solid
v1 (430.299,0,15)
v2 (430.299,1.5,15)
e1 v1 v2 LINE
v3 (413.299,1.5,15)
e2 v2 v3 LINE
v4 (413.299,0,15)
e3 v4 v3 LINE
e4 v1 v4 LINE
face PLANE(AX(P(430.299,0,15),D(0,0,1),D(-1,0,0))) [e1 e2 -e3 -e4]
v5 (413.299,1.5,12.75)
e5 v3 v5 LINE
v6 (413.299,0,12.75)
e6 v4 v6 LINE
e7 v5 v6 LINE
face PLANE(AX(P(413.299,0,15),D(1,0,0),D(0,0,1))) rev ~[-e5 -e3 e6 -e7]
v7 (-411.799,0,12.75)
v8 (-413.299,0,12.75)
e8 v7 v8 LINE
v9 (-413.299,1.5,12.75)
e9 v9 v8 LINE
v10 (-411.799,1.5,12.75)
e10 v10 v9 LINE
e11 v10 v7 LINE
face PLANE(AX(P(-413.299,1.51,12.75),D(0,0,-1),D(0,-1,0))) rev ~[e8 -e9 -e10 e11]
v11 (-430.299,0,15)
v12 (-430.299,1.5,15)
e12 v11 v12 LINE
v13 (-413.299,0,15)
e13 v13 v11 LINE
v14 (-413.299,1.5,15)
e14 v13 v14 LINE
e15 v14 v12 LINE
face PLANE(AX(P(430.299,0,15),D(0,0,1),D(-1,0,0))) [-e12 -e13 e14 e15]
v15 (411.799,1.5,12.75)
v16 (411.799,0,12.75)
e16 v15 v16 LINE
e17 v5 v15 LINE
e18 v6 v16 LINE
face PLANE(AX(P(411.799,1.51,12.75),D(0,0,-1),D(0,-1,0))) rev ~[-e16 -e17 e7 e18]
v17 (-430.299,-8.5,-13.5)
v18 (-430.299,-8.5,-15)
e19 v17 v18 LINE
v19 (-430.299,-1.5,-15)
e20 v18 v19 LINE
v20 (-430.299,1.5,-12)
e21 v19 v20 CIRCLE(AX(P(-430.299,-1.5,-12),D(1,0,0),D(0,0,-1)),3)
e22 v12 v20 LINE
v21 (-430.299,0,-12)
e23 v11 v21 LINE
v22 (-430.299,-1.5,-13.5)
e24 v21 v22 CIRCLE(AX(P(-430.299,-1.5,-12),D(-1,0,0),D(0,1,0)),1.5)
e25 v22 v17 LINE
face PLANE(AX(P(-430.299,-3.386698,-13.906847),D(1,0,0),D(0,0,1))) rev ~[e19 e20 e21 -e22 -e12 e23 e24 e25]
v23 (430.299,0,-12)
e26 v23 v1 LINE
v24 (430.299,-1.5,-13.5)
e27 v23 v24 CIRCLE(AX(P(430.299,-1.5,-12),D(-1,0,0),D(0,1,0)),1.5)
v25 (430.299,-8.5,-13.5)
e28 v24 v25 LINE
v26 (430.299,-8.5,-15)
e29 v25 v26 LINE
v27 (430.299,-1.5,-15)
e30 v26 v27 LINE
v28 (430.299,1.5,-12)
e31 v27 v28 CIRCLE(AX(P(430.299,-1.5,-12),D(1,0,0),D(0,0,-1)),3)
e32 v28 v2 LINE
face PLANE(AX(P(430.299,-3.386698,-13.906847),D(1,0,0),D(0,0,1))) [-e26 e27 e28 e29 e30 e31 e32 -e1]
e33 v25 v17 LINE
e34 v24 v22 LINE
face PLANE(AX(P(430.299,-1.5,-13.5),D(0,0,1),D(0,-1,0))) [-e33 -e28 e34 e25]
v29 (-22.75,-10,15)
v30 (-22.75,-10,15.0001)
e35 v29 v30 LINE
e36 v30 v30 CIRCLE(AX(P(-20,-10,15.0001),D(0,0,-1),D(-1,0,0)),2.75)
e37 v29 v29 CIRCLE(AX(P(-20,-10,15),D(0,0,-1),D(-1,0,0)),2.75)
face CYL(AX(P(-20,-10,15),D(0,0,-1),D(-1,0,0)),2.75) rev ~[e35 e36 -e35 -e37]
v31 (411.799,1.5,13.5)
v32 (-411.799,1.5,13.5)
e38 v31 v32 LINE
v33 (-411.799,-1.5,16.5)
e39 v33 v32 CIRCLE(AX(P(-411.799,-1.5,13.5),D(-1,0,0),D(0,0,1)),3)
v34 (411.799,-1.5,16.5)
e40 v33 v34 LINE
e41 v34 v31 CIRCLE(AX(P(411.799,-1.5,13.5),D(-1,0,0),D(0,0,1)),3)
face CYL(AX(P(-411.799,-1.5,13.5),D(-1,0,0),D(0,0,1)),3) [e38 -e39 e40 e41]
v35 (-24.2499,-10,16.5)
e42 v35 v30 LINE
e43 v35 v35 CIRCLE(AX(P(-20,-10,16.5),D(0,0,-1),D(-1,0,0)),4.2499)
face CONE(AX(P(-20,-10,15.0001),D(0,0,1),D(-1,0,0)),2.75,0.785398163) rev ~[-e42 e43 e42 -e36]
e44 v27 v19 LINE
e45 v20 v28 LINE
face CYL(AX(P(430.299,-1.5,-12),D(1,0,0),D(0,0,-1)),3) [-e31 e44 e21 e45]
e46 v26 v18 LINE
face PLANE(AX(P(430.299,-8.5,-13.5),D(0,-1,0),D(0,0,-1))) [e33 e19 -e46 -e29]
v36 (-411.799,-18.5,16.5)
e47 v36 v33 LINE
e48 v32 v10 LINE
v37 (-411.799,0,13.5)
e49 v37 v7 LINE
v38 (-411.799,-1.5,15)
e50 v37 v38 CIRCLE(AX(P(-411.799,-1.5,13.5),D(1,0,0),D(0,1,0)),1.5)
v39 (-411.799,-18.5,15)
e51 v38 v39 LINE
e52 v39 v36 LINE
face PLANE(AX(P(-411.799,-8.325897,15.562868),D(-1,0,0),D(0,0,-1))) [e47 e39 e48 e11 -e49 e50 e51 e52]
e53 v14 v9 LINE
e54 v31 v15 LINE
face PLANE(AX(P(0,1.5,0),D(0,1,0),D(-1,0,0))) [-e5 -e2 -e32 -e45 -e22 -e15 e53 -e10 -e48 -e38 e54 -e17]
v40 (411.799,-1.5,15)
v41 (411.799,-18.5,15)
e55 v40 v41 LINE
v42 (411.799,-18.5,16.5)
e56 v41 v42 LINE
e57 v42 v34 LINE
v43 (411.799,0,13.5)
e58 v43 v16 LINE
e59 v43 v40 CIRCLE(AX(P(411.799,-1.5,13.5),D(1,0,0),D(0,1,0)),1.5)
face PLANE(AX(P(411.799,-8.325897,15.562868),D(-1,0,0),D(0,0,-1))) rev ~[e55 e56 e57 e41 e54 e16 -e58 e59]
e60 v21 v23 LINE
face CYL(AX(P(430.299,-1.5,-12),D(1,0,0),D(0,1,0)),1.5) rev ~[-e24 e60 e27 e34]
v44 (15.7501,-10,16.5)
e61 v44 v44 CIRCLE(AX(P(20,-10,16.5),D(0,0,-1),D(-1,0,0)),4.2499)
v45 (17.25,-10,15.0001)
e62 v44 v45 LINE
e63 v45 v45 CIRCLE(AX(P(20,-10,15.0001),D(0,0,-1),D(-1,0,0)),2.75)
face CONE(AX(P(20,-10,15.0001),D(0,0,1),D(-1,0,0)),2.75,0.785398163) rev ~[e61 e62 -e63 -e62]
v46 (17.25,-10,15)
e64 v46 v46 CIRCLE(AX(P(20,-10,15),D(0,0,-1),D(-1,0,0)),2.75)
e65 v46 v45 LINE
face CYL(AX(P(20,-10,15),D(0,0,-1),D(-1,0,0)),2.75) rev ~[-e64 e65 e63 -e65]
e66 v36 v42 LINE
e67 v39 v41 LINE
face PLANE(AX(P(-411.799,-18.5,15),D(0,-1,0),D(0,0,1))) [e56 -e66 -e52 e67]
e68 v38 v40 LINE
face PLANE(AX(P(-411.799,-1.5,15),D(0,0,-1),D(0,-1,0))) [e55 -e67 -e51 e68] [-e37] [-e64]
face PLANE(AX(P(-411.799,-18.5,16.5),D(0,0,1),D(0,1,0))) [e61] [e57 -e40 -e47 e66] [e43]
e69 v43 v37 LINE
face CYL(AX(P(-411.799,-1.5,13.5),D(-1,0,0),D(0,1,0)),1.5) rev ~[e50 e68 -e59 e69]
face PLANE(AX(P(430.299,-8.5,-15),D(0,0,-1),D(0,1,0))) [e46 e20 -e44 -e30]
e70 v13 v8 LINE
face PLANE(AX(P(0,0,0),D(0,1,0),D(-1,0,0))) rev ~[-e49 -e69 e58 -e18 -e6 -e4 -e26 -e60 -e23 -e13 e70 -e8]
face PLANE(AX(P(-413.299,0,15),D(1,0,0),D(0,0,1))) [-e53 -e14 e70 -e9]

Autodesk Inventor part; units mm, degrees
ref_plane "YZ Plane" through (0, 0, 0) normal (1, 0, 0) x (0, 1, 0)
ref_plane "XZ Plane" through (0, 0, 0) normal (0, 1, 0) x (-1, 0, 0)
ref_plane "XY Plane" through (0, 0, 0) normal (0, 0, 1) x (1, 0, 0)
sketch "Sketch2" plane through (0, 0, 0) normal (0, 1, 0) x (-1, 0, 0)
  line L0 (-430.299, 15) -> (430.299, 15)
  line L1 (430.299, 15) -> (430.299, -15)
  line L2 (430.299, -15) -> (-430.299, -15)
  line L3 (-430.299, -15) -> (-430.299, 15)
  line L4 (-430.299, 15) -> (430.299, -15) construction
  line L5 (430.299, 15) -> (-430.299, -15) construction
  point P0 (0, 0)
  dimension "d12" = 860.598
  dimension "d13" = 30
extrude "Plate2" add sketch "Sketch2" along normal blind 1.5
sketch "Sketch3" plane through (-430.299, 0, 15) normal (0, 0, 1) x (1, 0, 0)
  line L0 (842.098, 0) -> (18.5, 0)
  line L1 (18.5, 0) -> (18.5, -18.5)
  line L2 (18.5, -18.5) -> (842.098, -18.5)
  line L3 (842.098, -18.5) -> (842.098, 0)
edge flange "Flange1" height 20 angle 90 thickness 1.5 bend radius 1.5 thickness toward (0, 0, 1) relief straight relief width 1.5 relief depth 0.75 edges at (0, 0, 15) wall of the first edge with corners at (411.799, 0, 15) (-411.799, 0, 15) (-411.799, -18.5, 15) (411.799, -18.5, 15)
bend "Bend2"
corner "Corner2"
sketch "Sketch4" plane through (430.299, 1.5, -13.5) normal (0, 0, -1) x (-1, 0, 0)
  line L0 (860.598, 0) -> (0, 0)
  line L1 (0, 0) -> (0, -10)
  line L2 (0, -10) -> (860.598, -10)
  line L3 (860.598, -10) -> (860.598, 0)
edge flange "Flange2" height 10 angle 90 thickness 1.5 bend radius 1.5 thickness toward (0, 0, -1) relief tear relief width 1.5 relief depth 0.75 edges at (0, 0, -15) wall of the first edge with corners at (-430.299, 1.5, -13.5) (430.299, 1.5, -13.5) (430.299, -8.5, -13.5) (-430.299, -8.5, -13.5)
bend "Bend3"
corner "Corner3"
sketch "Sketch5" plane through (411.799, -18.5, 15) normal (0, 0, -1) x (-1, 0, 0)
  circle A0 centre (391.799, 8.5) radius 2.067 construction
  circle A1 centre (431.799, 8.5) radius 2.067 construction
  circle A2 centre (391.799, 8.5) radius 2.75
  circle A3 centre (431.799, 8.5) radius 2.75
  point P0 (411.799, 18.5)
  dimension "d36" = 5.5
  dimension "d37" = 5.5
extrude "Extrusion1" cut sketch "Sketch5" against normal blind 1.5
chamfer "Chamfer1" distance 1.5 angle 45 2 edges at (22.75, -10, 16.5) (-17.25, -10, 16.5)
equation "\"d38\" = Thickness"
equation "\"d15\" = BendReliefWidth"
equation "\"d16\" = BendReliefDepth"
equation "\"d17\" = MinimumRemnant"
equation "\"d18\" = BendRadius"
equation "\"d22\" = BendRadius"
equation "\"d23\" = CornerReliefSize"
equation "\"d24\" = GapSize"
equation "\"d25\" = JacobiRadiusSize"
equation "\"d26\" = BendReliefWidth"
equation "\"d27\" = BendReliefDepth"
equation "\"d28\" = MinimumRemnant"
equation "\"d29\" = BendRadius"
equation "\"d32\" = BendRadius"
equation "\"d33\" = CornerReliefSize"
equation "\"d34\" = GapSize"
equation "\"d35\" = JacobiRadiusSize"
equation "\"BendRadius\" = Thickness"
equation "\"BendReliefWidth\" = Thickness"
equation "\"BendReliefDepth\" = 0.5 * Thickness"
equation "\"CornerReliefSize\" = 4 * Thickness"
equation "\"MinimumRemnant\" = 2 * Thickness"
equation "\"TransitionRadius\" = BendRadius"
equation "\"JacobiRadiusSize\" = BendRadius"
equation "\"GapSize\" = Thickness"
equation "\"d14\" = BendRadius"
equation "\"Thickness\" = 1.5"
properties part number "Batente Sup." material "Stainless Steel"
